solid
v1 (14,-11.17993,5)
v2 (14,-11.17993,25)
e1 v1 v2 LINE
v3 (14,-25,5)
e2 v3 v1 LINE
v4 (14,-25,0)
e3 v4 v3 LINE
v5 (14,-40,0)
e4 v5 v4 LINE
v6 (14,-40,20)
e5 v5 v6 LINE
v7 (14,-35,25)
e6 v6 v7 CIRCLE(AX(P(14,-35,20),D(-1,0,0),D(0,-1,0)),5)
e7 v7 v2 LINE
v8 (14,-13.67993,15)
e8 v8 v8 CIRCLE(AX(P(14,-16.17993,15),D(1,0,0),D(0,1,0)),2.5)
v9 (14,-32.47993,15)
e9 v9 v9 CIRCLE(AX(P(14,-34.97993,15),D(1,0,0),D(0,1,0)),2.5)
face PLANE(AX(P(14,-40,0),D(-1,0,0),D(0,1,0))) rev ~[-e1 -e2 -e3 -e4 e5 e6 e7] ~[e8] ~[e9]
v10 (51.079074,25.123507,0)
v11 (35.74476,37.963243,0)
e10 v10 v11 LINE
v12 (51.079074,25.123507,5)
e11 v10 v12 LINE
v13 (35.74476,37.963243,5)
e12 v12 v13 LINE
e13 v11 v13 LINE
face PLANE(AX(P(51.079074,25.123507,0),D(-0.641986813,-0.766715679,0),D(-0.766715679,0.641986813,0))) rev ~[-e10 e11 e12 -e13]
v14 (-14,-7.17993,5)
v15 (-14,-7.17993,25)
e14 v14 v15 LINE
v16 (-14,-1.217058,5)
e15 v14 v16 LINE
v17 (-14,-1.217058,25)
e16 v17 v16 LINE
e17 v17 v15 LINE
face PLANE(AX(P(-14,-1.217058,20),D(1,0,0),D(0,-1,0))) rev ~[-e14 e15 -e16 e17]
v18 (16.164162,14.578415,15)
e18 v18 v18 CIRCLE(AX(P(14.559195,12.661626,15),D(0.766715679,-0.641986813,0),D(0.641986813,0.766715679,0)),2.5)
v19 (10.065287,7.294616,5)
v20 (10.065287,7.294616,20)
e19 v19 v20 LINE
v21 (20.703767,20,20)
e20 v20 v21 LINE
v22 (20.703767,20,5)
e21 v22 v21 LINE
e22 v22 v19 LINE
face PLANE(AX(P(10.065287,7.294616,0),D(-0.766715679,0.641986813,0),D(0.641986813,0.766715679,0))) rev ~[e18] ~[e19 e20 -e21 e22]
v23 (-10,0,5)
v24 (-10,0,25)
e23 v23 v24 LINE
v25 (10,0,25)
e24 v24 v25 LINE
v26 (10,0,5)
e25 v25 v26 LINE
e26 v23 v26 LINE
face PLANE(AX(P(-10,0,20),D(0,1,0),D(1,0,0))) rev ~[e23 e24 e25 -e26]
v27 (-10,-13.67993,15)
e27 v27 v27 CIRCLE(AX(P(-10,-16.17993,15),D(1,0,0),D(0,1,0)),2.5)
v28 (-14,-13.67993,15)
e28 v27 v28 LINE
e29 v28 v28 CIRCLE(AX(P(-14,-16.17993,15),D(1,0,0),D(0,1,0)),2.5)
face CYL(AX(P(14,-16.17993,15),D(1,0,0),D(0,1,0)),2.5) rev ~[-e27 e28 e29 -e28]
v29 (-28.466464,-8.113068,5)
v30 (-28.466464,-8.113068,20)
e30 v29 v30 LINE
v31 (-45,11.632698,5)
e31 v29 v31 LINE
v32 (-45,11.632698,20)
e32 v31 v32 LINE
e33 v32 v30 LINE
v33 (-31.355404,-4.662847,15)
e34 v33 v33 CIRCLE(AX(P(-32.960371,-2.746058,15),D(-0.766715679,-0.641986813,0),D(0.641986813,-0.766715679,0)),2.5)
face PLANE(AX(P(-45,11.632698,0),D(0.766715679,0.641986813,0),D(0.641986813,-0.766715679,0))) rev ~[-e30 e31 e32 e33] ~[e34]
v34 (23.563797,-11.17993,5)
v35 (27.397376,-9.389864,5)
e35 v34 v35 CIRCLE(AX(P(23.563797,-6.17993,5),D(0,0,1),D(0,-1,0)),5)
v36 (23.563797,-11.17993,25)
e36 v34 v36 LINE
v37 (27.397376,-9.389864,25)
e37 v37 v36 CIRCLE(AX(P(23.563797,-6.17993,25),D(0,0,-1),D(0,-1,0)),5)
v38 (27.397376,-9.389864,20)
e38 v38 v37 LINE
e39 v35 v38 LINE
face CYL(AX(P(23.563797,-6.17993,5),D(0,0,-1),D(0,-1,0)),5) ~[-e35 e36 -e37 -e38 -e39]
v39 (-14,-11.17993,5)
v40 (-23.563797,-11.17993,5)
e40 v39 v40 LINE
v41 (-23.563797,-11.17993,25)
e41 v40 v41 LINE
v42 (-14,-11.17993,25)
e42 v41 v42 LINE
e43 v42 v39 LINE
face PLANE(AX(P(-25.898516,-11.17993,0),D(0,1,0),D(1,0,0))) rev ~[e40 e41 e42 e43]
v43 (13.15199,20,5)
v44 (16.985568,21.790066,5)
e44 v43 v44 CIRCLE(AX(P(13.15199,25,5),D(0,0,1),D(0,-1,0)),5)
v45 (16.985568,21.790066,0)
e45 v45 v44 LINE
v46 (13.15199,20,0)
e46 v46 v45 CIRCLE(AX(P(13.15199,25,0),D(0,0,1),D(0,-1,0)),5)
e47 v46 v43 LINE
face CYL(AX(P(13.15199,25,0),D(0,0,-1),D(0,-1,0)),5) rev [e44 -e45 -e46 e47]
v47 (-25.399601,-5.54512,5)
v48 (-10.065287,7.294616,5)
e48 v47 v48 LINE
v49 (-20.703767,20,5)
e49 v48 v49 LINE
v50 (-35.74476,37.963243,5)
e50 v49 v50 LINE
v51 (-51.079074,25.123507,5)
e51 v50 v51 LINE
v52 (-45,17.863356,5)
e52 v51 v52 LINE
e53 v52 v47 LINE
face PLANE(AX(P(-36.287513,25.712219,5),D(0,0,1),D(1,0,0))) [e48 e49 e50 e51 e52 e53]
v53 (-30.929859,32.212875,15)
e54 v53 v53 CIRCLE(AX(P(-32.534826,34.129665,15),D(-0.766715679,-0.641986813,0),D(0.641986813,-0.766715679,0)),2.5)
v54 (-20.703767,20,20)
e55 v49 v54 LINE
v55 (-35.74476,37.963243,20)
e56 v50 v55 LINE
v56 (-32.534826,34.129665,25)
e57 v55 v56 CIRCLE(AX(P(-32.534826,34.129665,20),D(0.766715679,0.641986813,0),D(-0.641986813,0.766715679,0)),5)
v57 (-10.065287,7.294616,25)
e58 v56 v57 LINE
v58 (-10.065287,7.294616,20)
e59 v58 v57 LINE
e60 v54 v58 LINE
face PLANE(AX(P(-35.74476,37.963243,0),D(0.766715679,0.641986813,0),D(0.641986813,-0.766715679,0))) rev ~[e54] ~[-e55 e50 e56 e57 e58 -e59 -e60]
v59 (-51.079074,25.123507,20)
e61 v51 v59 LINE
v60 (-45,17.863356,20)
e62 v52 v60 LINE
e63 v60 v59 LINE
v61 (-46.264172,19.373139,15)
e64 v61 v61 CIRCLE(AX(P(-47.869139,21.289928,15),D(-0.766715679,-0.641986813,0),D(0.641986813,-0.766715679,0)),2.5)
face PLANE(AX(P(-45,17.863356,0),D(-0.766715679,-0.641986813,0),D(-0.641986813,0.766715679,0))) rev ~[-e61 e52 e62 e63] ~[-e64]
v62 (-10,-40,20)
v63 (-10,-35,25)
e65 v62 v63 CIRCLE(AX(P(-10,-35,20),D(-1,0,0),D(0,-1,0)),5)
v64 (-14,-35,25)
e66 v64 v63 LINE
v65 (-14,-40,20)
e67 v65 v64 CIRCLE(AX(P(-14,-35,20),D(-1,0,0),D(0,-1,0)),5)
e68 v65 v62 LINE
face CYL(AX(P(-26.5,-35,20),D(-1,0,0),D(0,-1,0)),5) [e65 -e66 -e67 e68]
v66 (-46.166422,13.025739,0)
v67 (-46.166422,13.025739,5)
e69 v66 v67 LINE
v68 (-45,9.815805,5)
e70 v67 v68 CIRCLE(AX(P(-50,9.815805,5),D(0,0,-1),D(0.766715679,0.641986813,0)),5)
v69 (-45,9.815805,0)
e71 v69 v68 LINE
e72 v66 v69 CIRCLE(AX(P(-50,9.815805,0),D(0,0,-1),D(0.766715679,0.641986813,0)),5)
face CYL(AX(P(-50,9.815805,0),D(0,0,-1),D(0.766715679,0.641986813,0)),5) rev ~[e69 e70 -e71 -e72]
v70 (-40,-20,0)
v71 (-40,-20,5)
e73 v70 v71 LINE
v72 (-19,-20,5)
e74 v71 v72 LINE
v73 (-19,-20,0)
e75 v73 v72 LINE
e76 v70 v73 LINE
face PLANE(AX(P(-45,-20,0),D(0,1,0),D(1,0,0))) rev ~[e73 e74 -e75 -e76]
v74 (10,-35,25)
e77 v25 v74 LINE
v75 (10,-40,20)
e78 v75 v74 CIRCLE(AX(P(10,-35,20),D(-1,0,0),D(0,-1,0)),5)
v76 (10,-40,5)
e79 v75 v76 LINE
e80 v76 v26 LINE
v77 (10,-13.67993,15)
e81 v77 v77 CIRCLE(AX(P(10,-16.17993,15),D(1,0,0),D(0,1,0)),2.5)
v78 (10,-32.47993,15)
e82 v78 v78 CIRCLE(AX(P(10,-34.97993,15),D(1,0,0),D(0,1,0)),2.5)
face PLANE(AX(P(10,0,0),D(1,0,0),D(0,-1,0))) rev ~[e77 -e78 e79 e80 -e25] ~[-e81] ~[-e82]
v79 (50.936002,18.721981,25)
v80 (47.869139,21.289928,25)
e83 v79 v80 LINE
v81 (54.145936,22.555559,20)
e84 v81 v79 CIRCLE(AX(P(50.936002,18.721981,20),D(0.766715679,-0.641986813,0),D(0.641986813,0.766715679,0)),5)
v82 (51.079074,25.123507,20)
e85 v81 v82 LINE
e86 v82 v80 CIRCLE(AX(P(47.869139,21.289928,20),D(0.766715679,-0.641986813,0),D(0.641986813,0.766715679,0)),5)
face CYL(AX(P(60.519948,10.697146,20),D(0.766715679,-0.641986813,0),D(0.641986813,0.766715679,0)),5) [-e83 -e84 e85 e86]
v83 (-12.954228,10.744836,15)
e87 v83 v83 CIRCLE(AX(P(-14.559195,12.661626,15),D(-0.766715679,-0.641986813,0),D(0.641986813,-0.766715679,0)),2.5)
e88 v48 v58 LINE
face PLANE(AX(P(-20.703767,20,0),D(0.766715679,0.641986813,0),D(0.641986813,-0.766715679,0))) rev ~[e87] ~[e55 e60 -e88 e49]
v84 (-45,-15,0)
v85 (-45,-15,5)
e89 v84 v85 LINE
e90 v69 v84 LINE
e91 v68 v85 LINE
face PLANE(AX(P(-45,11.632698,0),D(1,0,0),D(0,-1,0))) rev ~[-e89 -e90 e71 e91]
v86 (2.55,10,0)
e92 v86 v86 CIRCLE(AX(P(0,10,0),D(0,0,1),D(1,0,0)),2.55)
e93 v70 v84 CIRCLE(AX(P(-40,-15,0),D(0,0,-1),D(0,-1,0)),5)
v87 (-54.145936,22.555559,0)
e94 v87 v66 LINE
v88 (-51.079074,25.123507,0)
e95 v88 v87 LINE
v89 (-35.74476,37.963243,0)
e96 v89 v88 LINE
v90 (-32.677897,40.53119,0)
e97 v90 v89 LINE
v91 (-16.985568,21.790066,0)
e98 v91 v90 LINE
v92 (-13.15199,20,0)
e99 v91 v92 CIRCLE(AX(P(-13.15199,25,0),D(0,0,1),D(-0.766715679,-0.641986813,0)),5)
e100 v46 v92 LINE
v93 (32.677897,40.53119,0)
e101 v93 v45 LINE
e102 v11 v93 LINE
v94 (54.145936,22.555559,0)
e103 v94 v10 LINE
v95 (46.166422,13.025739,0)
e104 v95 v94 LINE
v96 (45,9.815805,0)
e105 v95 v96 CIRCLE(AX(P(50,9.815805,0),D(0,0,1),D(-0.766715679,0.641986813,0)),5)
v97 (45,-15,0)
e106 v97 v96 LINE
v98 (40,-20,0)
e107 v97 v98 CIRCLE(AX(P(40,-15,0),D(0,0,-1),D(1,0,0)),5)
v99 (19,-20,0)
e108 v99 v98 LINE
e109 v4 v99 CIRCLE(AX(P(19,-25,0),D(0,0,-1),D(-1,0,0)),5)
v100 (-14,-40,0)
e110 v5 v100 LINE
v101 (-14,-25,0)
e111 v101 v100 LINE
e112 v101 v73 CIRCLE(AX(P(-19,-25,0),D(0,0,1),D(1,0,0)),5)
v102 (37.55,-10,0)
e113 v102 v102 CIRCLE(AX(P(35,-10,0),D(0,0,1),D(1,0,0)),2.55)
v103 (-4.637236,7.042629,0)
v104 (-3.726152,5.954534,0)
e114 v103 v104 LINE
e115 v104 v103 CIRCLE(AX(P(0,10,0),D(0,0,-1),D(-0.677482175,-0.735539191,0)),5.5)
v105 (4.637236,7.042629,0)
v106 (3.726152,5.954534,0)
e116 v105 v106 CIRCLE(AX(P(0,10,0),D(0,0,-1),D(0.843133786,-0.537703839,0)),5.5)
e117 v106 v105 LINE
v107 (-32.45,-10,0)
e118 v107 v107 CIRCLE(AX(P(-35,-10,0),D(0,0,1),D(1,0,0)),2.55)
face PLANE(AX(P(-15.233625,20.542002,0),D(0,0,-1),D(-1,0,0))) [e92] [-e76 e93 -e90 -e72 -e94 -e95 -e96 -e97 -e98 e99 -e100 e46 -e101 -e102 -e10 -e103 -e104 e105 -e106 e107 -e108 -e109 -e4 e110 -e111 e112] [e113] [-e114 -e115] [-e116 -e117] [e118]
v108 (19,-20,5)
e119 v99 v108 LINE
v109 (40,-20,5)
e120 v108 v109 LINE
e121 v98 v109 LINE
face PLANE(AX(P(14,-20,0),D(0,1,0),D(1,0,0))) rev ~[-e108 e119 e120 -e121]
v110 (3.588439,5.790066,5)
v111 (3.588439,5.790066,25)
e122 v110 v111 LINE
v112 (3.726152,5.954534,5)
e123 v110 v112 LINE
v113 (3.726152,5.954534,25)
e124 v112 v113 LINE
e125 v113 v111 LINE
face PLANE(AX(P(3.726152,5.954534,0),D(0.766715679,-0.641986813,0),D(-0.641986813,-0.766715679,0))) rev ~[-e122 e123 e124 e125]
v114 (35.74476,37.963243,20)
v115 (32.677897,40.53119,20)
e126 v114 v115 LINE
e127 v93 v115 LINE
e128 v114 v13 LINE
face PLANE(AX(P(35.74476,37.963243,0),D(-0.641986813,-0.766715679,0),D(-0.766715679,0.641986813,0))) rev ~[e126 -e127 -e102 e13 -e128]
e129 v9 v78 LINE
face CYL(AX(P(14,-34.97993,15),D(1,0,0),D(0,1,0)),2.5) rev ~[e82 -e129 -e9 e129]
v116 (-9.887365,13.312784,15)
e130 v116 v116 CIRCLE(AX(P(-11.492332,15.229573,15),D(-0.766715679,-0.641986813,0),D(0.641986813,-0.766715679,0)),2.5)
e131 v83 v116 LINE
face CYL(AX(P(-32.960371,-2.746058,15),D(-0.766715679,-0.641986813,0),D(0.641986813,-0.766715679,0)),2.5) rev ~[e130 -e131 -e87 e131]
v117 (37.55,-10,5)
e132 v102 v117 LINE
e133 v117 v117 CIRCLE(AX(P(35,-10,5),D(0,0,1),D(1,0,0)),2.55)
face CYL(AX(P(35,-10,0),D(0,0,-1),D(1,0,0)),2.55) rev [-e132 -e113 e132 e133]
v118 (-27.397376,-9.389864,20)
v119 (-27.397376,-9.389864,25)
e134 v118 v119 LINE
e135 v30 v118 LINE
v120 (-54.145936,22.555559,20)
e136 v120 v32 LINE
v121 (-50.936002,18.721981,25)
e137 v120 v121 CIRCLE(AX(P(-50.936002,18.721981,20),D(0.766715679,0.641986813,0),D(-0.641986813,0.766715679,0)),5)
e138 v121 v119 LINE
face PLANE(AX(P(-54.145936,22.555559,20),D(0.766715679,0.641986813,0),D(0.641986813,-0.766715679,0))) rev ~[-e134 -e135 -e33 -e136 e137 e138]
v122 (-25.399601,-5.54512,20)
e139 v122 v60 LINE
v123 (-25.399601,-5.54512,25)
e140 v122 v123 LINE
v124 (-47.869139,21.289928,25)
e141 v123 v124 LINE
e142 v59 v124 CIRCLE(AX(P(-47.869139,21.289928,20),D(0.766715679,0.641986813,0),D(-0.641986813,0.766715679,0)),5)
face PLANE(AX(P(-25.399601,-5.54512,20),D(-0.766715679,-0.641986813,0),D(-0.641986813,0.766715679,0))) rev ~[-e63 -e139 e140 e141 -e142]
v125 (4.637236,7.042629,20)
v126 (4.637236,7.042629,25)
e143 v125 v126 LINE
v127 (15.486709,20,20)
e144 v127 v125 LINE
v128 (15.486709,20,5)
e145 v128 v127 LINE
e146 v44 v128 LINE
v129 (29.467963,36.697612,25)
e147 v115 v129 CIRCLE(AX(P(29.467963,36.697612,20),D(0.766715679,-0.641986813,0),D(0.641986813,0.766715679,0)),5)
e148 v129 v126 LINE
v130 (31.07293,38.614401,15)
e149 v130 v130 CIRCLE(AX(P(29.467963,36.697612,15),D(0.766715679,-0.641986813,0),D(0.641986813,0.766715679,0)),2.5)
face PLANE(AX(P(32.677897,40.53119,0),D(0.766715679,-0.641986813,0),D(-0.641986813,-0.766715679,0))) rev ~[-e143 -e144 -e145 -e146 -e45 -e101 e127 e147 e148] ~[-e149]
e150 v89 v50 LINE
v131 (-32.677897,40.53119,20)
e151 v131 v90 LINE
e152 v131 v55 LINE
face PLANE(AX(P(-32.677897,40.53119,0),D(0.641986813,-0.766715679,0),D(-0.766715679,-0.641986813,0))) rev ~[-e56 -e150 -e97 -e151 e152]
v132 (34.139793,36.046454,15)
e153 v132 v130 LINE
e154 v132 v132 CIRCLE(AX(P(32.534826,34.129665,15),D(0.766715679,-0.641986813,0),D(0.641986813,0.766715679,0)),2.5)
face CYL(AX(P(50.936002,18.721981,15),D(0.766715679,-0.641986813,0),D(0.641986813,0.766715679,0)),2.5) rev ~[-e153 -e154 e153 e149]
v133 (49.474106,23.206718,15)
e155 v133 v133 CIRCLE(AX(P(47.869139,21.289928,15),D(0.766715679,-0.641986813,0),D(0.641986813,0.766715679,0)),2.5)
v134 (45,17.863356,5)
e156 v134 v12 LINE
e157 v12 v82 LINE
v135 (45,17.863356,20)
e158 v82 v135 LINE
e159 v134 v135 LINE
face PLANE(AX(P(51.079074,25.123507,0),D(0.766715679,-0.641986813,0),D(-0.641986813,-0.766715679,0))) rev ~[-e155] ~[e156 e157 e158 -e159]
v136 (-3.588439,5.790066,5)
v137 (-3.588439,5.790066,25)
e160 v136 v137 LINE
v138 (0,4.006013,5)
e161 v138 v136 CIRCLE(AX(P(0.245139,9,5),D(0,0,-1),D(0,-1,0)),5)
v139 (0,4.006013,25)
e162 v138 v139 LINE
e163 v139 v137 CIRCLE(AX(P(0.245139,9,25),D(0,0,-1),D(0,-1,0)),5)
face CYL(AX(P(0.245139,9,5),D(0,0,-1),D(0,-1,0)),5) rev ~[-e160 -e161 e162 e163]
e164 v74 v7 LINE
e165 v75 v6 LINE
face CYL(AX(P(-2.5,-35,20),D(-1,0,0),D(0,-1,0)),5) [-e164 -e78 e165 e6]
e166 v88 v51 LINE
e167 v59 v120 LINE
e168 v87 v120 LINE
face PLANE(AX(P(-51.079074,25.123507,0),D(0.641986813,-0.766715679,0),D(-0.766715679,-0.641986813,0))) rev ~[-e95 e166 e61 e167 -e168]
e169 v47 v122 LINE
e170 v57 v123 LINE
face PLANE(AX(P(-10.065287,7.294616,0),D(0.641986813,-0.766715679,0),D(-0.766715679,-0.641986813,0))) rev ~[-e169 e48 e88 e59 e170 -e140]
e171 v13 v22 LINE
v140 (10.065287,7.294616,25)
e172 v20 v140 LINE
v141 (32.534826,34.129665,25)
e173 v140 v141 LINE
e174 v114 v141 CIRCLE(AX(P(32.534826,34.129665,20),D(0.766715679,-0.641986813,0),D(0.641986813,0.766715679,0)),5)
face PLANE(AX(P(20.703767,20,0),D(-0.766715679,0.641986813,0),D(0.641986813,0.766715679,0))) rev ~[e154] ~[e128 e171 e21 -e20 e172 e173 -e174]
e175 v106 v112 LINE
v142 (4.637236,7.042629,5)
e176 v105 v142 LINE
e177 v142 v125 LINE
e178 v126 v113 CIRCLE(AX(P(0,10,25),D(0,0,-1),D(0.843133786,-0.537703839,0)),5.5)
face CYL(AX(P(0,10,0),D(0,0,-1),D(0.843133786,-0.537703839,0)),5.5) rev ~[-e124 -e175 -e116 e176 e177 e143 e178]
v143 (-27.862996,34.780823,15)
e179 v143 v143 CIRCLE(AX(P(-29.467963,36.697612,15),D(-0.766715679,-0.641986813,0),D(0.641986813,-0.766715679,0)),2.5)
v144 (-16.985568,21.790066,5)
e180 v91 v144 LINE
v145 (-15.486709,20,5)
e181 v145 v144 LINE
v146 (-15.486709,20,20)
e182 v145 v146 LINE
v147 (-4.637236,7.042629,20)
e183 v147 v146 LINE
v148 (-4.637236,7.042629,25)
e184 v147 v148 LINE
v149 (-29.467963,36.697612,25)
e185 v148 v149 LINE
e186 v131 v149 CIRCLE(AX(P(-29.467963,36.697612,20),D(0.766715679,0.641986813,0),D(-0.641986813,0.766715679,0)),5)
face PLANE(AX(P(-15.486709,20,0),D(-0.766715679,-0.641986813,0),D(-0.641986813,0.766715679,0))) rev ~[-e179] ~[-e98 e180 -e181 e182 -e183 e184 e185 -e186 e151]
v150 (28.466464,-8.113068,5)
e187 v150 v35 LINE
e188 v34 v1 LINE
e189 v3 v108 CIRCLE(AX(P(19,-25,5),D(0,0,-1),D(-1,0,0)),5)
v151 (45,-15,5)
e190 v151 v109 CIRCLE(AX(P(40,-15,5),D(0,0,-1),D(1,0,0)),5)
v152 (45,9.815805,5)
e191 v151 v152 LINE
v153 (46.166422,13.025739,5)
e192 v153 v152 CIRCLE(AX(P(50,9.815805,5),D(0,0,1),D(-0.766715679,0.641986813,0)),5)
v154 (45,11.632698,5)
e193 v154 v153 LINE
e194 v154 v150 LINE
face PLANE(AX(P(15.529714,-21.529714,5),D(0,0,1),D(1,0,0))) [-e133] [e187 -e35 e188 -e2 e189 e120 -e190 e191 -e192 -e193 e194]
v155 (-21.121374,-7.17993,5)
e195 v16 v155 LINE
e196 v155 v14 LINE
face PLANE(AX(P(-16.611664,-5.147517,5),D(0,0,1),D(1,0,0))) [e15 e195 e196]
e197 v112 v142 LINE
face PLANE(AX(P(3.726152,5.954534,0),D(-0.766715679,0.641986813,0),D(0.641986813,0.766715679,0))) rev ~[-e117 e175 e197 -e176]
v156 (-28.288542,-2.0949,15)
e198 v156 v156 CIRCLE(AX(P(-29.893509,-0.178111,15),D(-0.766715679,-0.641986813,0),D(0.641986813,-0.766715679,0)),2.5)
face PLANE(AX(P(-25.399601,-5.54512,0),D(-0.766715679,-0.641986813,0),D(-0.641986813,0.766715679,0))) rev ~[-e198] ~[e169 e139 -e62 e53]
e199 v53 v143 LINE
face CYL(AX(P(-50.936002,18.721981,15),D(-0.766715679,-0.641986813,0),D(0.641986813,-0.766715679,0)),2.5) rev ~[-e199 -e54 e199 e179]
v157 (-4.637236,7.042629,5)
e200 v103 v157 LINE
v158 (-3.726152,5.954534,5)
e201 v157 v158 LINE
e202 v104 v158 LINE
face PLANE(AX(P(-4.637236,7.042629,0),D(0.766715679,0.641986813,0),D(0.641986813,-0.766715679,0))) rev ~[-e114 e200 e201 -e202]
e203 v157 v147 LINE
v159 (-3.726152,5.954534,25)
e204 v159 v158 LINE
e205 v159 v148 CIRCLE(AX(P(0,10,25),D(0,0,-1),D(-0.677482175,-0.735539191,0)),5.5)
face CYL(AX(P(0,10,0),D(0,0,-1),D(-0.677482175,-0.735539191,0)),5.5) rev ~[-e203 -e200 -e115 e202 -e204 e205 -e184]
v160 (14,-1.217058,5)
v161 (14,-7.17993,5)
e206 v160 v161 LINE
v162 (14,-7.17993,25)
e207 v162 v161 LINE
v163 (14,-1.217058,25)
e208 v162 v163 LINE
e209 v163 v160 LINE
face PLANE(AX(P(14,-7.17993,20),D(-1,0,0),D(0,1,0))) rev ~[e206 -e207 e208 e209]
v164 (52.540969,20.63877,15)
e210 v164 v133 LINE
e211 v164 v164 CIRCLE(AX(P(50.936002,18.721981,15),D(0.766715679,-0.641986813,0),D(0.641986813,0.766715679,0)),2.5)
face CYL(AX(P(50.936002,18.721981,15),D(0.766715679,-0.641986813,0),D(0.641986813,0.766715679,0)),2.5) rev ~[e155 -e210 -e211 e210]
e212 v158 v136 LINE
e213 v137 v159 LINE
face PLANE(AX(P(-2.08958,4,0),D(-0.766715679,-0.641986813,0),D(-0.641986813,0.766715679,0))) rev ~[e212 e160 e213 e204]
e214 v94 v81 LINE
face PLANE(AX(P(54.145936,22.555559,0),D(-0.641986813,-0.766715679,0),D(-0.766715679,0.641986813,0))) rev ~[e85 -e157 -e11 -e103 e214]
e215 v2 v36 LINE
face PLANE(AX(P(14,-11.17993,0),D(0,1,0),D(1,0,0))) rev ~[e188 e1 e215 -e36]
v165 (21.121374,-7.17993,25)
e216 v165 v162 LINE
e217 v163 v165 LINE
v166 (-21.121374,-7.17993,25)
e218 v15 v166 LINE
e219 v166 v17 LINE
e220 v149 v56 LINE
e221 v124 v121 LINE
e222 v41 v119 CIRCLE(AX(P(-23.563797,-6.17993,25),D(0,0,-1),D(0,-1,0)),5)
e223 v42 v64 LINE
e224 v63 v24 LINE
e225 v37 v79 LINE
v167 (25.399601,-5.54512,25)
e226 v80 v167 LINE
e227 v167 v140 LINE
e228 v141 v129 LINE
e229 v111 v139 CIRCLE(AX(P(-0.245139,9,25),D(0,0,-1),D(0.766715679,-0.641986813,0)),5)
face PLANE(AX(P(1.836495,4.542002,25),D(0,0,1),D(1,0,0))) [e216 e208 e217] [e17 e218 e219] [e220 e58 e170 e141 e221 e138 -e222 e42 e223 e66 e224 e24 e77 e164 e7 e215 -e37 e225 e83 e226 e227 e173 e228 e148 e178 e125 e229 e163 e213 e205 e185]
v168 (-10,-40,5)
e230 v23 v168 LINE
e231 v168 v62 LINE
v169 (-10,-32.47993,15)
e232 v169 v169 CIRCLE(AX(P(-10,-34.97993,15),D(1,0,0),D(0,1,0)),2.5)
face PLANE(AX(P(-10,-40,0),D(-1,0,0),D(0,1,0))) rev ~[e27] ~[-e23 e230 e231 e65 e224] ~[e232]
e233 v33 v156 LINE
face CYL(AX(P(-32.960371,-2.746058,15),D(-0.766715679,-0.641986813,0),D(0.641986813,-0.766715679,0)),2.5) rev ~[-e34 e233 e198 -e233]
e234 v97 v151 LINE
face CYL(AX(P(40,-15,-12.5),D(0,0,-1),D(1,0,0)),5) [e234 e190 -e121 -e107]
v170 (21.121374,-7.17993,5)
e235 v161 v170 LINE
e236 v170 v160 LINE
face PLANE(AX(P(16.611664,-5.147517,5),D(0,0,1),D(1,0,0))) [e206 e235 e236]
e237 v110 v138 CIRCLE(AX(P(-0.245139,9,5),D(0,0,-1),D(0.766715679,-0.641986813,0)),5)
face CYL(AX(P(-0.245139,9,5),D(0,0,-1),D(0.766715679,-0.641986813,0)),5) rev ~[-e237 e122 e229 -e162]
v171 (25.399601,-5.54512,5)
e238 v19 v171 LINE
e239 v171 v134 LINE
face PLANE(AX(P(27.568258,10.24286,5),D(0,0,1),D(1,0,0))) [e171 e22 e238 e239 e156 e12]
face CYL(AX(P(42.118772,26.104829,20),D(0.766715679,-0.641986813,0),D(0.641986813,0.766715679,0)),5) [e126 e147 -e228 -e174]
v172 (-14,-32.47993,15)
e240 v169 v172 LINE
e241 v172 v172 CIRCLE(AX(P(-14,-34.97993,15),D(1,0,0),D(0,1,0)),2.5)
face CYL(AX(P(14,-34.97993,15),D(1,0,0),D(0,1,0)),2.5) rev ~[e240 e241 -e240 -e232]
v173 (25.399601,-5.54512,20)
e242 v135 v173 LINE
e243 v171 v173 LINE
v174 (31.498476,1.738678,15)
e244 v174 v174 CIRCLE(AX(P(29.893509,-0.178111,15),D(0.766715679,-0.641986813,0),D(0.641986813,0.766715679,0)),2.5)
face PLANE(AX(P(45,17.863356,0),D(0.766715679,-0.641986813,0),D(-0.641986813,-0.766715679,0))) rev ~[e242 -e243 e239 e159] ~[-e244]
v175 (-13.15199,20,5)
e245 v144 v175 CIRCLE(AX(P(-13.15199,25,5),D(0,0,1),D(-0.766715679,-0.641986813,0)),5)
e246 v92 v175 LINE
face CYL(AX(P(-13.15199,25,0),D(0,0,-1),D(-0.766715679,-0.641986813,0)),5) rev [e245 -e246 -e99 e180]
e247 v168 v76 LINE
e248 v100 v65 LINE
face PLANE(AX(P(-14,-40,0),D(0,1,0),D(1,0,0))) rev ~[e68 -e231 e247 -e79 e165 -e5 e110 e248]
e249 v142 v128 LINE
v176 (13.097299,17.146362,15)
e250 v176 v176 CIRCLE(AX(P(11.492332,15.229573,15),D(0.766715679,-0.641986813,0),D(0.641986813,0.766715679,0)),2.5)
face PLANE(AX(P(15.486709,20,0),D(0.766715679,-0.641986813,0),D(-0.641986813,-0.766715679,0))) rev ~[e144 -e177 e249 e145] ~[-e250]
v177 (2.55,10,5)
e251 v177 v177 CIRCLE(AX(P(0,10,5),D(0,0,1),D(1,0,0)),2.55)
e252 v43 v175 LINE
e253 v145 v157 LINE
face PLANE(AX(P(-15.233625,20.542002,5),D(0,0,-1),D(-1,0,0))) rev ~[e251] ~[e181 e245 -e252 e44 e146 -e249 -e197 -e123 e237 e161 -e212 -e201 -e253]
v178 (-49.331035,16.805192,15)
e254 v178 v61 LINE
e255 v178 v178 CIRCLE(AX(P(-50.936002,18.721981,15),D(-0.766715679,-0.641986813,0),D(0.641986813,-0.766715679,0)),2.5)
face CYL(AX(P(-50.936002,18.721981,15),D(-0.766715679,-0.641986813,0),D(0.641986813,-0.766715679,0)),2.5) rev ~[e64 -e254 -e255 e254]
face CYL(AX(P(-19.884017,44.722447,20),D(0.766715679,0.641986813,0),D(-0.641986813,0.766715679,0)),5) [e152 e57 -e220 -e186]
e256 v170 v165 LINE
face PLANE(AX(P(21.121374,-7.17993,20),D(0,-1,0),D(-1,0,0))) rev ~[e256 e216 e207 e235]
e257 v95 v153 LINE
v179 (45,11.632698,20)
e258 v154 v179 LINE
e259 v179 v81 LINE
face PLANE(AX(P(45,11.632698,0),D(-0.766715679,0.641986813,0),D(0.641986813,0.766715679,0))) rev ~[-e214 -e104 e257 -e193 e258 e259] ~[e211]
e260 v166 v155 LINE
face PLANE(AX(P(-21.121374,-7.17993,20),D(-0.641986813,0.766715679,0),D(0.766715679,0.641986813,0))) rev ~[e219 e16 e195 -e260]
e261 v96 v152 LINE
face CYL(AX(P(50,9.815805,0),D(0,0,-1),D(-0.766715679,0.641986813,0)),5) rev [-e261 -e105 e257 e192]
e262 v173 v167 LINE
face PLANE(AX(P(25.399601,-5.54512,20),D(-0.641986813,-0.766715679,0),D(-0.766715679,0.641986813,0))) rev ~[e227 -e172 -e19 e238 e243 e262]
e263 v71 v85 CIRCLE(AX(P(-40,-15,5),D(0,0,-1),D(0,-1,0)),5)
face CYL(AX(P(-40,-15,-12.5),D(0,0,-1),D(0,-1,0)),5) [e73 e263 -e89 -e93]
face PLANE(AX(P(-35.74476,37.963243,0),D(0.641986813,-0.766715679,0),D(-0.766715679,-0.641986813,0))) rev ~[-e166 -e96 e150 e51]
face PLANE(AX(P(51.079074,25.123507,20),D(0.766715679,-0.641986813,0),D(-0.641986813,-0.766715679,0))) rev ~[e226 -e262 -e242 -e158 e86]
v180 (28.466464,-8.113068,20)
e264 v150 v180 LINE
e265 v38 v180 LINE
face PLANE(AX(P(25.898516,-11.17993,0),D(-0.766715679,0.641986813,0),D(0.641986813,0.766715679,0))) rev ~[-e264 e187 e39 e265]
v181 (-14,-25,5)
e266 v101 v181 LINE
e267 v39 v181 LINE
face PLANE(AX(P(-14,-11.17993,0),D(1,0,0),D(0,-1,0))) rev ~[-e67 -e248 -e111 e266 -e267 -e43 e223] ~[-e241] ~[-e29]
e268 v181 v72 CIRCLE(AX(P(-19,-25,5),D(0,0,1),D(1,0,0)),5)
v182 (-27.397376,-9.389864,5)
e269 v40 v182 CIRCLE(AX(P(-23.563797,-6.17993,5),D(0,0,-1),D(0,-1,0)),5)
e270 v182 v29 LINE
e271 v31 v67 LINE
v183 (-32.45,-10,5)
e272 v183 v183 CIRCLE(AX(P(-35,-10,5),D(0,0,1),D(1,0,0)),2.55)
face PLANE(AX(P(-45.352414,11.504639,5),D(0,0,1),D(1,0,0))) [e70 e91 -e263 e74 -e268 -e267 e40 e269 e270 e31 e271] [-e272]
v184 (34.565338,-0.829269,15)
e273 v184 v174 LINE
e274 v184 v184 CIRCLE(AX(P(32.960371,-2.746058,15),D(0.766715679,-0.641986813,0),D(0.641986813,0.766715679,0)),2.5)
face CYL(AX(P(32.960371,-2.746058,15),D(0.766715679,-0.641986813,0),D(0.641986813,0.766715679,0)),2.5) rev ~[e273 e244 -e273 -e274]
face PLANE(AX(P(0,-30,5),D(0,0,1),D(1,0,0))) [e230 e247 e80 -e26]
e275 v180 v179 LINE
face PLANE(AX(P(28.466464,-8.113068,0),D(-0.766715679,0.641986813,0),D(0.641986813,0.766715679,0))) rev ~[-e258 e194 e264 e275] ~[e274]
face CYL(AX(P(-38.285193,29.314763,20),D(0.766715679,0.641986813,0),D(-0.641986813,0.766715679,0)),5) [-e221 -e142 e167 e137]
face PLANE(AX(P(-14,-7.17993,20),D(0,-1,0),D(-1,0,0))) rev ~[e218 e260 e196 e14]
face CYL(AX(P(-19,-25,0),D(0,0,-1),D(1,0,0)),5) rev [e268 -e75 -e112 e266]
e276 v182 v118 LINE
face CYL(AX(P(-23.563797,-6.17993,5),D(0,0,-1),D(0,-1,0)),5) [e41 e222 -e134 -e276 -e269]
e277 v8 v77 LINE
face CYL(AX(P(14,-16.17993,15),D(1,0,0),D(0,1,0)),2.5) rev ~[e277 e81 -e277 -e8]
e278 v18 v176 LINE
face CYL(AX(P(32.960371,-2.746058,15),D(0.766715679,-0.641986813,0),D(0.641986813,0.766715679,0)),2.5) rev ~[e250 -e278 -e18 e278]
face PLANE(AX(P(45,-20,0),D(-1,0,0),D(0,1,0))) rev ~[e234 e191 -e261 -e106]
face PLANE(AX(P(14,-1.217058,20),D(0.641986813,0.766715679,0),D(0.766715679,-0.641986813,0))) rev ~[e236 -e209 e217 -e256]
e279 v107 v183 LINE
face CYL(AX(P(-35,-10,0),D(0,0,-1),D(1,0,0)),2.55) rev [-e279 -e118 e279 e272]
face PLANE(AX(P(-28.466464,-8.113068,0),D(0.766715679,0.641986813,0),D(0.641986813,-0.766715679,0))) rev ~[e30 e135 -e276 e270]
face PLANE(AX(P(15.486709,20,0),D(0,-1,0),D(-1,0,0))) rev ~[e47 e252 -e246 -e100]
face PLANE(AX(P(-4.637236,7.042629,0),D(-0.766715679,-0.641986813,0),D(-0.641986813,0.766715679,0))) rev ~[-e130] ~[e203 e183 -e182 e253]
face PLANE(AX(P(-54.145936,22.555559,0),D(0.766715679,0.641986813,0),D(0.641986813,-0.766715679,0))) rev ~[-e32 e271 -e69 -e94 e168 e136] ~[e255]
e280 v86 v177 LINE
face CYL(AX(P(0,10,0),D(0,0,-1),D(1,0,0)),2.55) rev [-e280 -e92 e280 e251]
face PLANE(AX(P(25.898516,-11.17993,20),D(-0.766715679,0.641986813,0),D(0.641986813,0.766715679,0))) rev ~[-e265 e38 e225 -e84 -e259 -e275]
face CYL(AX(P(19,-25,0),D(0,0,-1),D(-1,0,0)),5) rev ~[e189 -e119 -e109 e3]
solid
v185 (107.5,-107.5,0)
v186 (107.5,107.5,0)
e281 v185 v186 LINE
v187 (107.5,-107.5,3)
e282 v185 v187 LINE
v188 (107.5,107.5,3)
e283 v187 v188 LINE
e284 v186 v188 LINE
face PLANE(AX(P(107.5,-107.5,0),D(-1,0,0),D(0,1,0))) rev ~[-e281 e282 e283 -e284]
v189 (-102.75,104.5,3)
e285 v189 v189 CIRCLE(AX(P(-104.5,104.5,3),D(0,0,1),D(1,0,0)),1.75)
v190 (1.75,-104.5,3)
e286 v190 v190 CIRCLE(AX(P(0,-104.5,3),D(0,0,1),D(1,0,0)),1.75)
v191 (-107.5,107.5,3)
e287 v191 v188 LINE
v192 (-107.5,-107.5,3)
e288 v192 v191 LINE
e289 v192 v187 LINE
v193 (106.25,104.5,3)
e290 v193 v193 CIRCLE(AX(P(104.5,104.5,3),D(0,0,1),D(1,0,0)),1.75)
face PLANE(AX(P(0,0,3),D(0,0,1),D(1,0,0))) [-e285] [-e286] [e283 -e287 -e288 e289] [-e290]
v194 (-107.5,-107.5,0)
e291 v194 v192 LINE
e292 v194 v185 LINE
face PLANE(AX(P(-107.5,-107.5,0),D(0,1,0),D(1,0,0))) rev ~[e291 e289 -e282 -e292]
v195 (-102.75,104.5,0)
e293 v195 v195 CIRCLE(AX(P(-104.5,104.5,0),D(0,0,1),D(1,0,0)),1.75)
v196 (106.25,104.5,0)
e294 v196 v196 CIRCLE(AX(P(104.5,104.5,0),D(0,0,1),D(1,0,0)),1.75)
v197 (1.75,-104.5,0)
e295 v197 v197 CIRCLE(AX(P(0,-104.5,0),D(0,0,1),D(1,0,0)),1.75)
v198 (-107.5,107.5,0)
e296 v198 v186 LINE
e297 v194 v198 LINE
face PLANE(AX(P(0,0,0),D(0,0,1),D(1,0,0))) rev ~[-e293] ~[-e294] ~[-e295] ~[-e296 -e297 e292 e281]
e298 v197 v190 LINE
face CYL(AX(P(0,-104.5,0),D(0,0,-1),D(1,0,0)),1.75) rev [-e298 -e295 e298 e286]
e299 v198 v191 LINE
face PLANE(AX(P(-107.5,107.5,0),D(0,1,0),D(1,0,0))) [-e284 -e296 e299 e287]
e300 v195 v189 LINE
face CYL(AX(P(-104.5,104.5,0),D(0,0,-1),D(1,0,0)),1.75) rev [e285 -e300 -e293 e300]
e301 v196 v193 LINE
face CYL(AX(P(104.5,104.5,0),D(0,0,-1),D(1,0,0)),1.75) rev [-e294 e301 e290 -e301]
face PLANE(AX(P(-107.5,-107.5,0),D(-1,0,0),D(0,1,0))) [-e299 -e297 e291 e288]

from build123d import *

# Parameters (mm, degrees)
F0_W          = 215
F0_H          = 215
F0_R          = 1.75
F1_DEPTH      = 3
F2_W          = 4
F2_H          = 20
F3_DEPTH      = 20
F2_R          = 5.5
F2_R_2        = 2.55
F2_W_2        = 20
F4_DEPTH      = 5
F5_R          = 2.5
F6_DEPTH      = 40
F7_R          = 2.5
F8_DEPTH      = 40
F9_R          = 2.5
F10_DEPTH     = 40
F11_T1_DEPTH  = 20
F11_T3_DEPTH  = 5
F11_T5_DEPTH  = 30
F11_T7_DEPTH  = 25.8367983923
F11_T9_DEPTH  = 29
F11_T11_DEPTH = 29
F11_T13_DEPTH = 29
F11_T15_DEPTH = 29
F11_T17_DEPTH = 29
F11_T19_DEPTH = 29


# Not quite as in the source:
# - a fillet or chamfer that OpenCascade refuses, or shapes differently, is made with other operations: its cross-section is extruded or revolved along the edge and cut away or added


with BuildPart() as f1:
    # F0 (on Top) → F1 (new body)
    with BuildSketch(Plane.XY):
        Rectangle(F0_W, F0_H)
        with Locations((0, -104.5)):
            Circle(F0_R, mode=Mode.SUBTRACT)
        with Locations((-104.5, 104.5)):
            Circle(F0_R, mode=Mode.SUBTRACT)
        with Locations((104.5, 104.5)):
            Circle(F0_R, mode=Mode.SUBTRACT)
    extrude(amount=F1_DEPTH)


with BuildPart() as f3:
    # F2 (on Top) → F3 (new body)
    with BuildSketch(Plane.XY):
        Polygon((-35.7447599302, 37.963242952), (-20.7037670278, 20), (-15.4867092456, 20), (-32.6778972141, 40.5311902024), align=None)
        with BuildLine():
            Line((-15.4867092456, 20), (-20.7037670278, 20))
            Line((-20.7037670278, 20), (-10.0652874269, 7.2946157909))
            Line((-10.0652874269, 7.2946157909), (-14, 4))
            Line((-14, 4), (-2.089580059, 4))
            Line((-2.089580059, 4), (-3.7261519654, 5.9545344482))
            ThreePointArc((-3.7261519654, 5.9545344482), (-4.2169362347, 6.4690725308), (-4.6372358245, 7.0426288856))
            Line((-4.6372358245, 7.0426288856), (-15.4867092456, 20))
        make_face()
        Polygon((-25.3996010074, -5.5451204608), (-45, 17.8633560503), (-45, 11.6326984705), (-28.4664637236, -8.1130677111), (-25.8985164732, -11.1799304272), (-21.1213736161, -7.1799304272), (-14, -1.2170577822), (-14, 0), (-14, 4), align=None)
        Polygon((-45, 11.6326984705), (-45, 17.8633560503), (-51.0790735108, 25.1235067004), (-54.1459362269, 22.55555945), align=None)
        Polygon((-2.089580059, 4), (-14, 4), (-14, 0), (-10, 0), (10, 0), (14, 0), (14, 4), (2.089580059, 4), align=None)
        Polygon((-21.1213736161, -7.1799304272), (-25.8985164732, -11.1799304272), (-14, -11.1799304272), (-14, -7.1799304272), align=None)
        Polygon((-10, 0), (-14, 0), (-14, -1.2170577822), (-14, -7.1799304272), (-14, -11.1799304272), (-14, -20), (-10, -20), align=None)
        Polygon((14, 0), (10, 0), (10, -20), (14, -20), (14, -11.1799304272), (14, -7.1799304272), (14, -1.2170577822), align=None)
        with Locations((12, -30)):
            Rectangle(F2_W, F2_H)
        with Locations((-12, -30)):
            Rectangle(F2_W, F2_H)
        Polygon((14, -7.1799304272), (14, -11.1799304272), (25.8985164732, -11.1799304272), (21.1213736161, -7.1799304272), align=None)
        Polygon((45, 11.6326984705), (45, 17.8633560503), (25.3996010074, -5.5451204608), (14, 4), (14, 0), (14, -1.2170577822), (21.1213736161, -7.1799304272), (25.8985164732, -11.1799304272), (28.4664637236, -8.1130677111), align=None)
        with BuildLine():
            Line((20.7037670278, 20), (15.4867092456, 20))
            Line((15.4867092456, 20), (4.6372358245, 7.0426288856))
            ThreePointArc((4.6372358245, 7.0426288856), (4.2169362347, 6.4690725308), (3.7261519654, 5.9545344482))
            Line((3.7261519654, 5.9545344482), (2.089580059, 4))
            Line((2.089580059, 4), (14, 4))
            Line((14, 4), (10.0652874269, 7.2946157909))
            Line((10.0652874269, 7.2946157909), (20.7037670278, 20))
        make_face()
        Polygon((32.6778972141, 40.5311902024), (15.4867092456, 20), (20.7037670278, 20), (35.7447599302, 37.963242952), align=None)
        Polygon((51.0790735108, 25.1235067004), (45, 17.8633560503), (45, 11.6326984705), (54.1459362269, 22.55555945), align=None)
    extrude(amount=F3_DEPTH)

    # F2 (on Top) + F3_face (on face) → F4 (join)
    with BuildSketch(Plane.XY):
        Polygon((-45, 17.8633560503), (-45, 20), (-20.7037670278, 20), (-35.7447599302, 37.963242952), (-51.0790735108, 25.1235067004), align=None)
        Polygon((-28.4664637236, -8.1130677111), (-45, 11.6326984705), (-45, -20), (-14, -20), (-14, -11.1799304272), (-25.8985164732, -11.1799304272), align=None)
        with Locations((-35, -10)):
            Circle(F2_R, mode=Mode.SUBTRACT)
        with Locations((-35, -10)):
            Circle(F2_R)
        with Locations((-35, -10)):
            Circle(F2_R_2, mode=Mode.SUBTRACT)
        Polygon((-14, -7.1799304272), (-14, -1.2170577822), (-21.1213736161, -7.1799304272), align=None)
        Polygon((-20.7037670278, 20), (-45, 20), (-45, 17.8633560503), (-25.3996010074, -5.5451204608), (-14, 4), (-10.0652874269, 7.2946157909), align=None)
        with Locations((0, -30)):
            Rectangle(F2_W_2, F2_H)
        Polygon((45, -20), (45, 11.6326984705), (28.4664637236, -8.1130677111), (25.8985164732, -11.1799304272), (14, -11.1799304272), (14, -20), align=None)
        with Locations((35, -10)):
            Circle(F2_R, mode=Mode.SUBTRACT)
        Polygon((21.1213736161, -7.1799304272), (14, -1.2170577822), (14, -7.1799304272), align=None)
        with Locations((35, -10)):
            Circle(F2_R)
        with Locations((35, -10)):
            Circle(F2_R_2, mode=Mode.SUBTRACT)
        Polygon((45, 20), (20.7037670278, 20), (10.0652874269, 7.2946157909), (14, 4), (25.3996010074, -5.5451204608), (45, 17.8633560503), align=None)
        with BuildLine():
            Line((15.4867092456, 20), (-15.4867092456, 20))
            Line((-15.4867092456, 20), (-4.6372358245, 7.0426288856))
            ThreePointArc((-4.6372358245, 7.0426288856), (-1.5403251224, 15.2799051618), (5.5, 10))
            ThreePointArc((5.5, 10), (5.2799051618, 8.4596748776), (4.6372358245, 7.0426288856))
            Line((4.6372358245, 7.0426288856), (15.4867092456, 20))
        make_face()
        with BuildLine():
            ThreePointArc((5.5, 10), (-1.5403251224, 15.2799051618), (-4.6372358245, 7.0426288856))
            Line((-4.6372358245, 7.0426288856), (-3.7261519654, 5.9545344482))
            ThreePointArc((-3.7261519654, 5.9545344482), (0, 4.5), (3.7261519654, 5.9545344482))
            Line((3.7261519654, 5.9545344482), (4.6372358245, 7.0426288856))
            ThreePointArc((4.6372358245, 7.0426288856), (5.2799051618, 8.4596748776), (5.5, 10))
        make_face()
        with Locations((0, 10)):
            Circle(F2_R_2, mode=Mode.SUBTRACT)
        with BuildLine():
            ThreePointArc((3.7261519654, 5.9545344482), (0, 4.5), (-3.7261519654, 5.9545344482))
            Line((-3.7261519654, 5.9545344482), (-2.089580059, 4))
            Line((-2.089580059, 4), (2.089580059, 4))
            Line((2.089580059, 4), (3.7261519654, 5.9545344482))
        make_face()
        Polygon((35.7447599302, 37.963242952), (20.7037670278, 20), (45, 20), (45, 17.8633560503), (51.0790735108, 25.1235067004), align=None)
        with Locations((0, -10)):
            Rectangle(F2_W_2, F2_H)
    with BuildSketch(Plane(origin=(0, 2.4667612993, 20), x_dir=(1, 0, 0), z_dir=(0, 0, 1))):
        with BuildLine():
            Line((-32.6778972141, 38.0644289031), (-35.7447599302, 35.4964816527))
            Line((-35.7447599302, 35.4964816527), (-10.0652874269, 4.8278544916))
            Line((-10.0652874269, 4.8278544916), (-25.3996010074, -8.0118817601))
            Line((-25.3996010074, -8.0118817601), (-51.0790735108, 22.6567454011))
            Line((-51.0790735108, 22.6567454011), (-54.1459362269, 20.0887981507))
            Line((-54.1459362269, 20.0887981507), (-25.8985164732, -13.6466917265))
            Line((-25.8985164732, -13.6466917265), (-14, -13.6466917265))
            Line((-14, -13.6466917265), (-14, -42.4667612993))
            Line((-14, -42.4667612993), (-10, -42.4667612993))
            Line((-10, -42.4667612993), (-10, -2.4667612993))
            Line((-10, -2.4667612993), (10, -2.4667612993))
            Line((10, -2.4667612993), (10, -42.4667612993))
            Line((10, -42.4667612993), (14, -42.4667612993))
            Line((14, -42.4667612993), (14, -13.6466917265))
            Line((14, -13.6466917265), (25.8985164732, -13.6466917265))
            Line((25.8985164732, -13.6466917265), (54.1459362269, 20.0887981507))
            Line((54.1459362269, 20.0887981507), (51.0790735108, 22.6567454011))
            Line((51.0790735108, 22.6567454011), (25.3996010074, -8.0118817601))
            Line((25.3996010074, -8.0118817601), (10.0652874269, 4.8278544916))
            Line((10.0652874269, 4.8278544916), (35.7447599302, 35.4964816527))
            Line((35.7447599302, 35.4964816527), (32.6778972141, 38.0644289031))
            Line((32.6778972141, 38.0644289031), (4.6372358245, 4.5758675863))
            ThreePointArc((4.6372358245, 4.5758675863), (4.2169362347, 4.0023112315), (3.7261519654, 3.4877731489))
            Line((3.7261519654, 3.4877731489), (2.089580059, 1.5332387007))
            Line((2.089580059, 1.5332387007), (-2.089580059, 1.5332387007))
            Line((-2.089580059, 1.5332387007), (-3.7261519654, 3.4877731489))
            ThreePointArc((-3.7261519654, 3.4877731489), (-4.2169362347, 4.0023112315), (-4.6372358245, 4.5758675863))
            Line((-4.6372358245, 4.5758675863), (-32.6778972141, 38.0644289031))
        make_face()
        Polygon((21.1213736161, -9.6466917265), (14, -9.6466917265), (14, -3.6838190815), align=None, mode=Mode.SUBTRACT)
        Polygon((-14, -9.6466917265), (-21.1213736161, -9.6466917265), (-14, -3.6838190815), align=None, mode=Mode.SUBTRACT)
    extrude(amount=F4_DEPTH)

    # F5 (on face) → F6 (cut)
    with BuildSketch(Plane.YZ.offset(14)):
        with Locations((-34.9799304272, 15)):
            Circle(F5_R)
        with Locations((-16.1799304272, 15)):
            Circle(F5_R)
    extrude(amount=-F6_DEPTH, mode=Mode.SUBTRACT)

    # F7 (on face) → F8 (cut)
    with BuildSketch(Plane(origin=(20.7275193584, -17.3555784101, 0), x_dir=(0.6419868126, 0.766715679, 0), z_dir=(0.766715679, -0.6419868126, 0))):
        with Locations((19.0546780923, 15)):
            Circle(F7_R)
        with Locations((47.0546780923, 15)):
            Circle(F7_R)
    extrude(amount=-F8_DEPTH, mode=Mode.SUBTRACT)

    # F9 (on face) → F10 (cut)
    with BuildSketch(Plane(origin=(-20.7275193584, -17.3555784101, 0), x_dir=(0.6419868126, -0.766715679, 0), z_dir=(-0.766715679, -0.6419868126, 0))):
        with Locations((-47.0546780923, 15)):
            Circle(F9_R)
        with Locations((-19.0546780923, 15)):
            Circle(F9_R)
    extrude(amount=-F10_DEPTH, mode=Mode.SUBTRACT)

    # F11: fillet of radius 5 on 18 edges, made by hand

    # F11_s2 → F11_t1 (join)
    with BuildSketch(Plane.XY.offset(5)):
        with BuildLine():
            ThreePointArc((3.5884390972, 5.7900659371), (1.870319244, 4.4695656767), (-0.2451392979, 4))
            Line((-0.2451392979, 4), (2.089580059, 4))
            Line((2.089580059, 4), (3.5884390972, 5.7900659371))
        make_face()
        with BuildLine():
            ThreePointArc((0.2451392979, 4), (-1.870319244, 4.4695656767), (-3.5884390972, 5.7900659371))
            Line((-3.5884390972, 5.7900659371), (-2.089580059, 4))
            Line((-2.089580059, 4), (0.2451392979, 4))
        make_face()
    extrude(amount=F11_T1_DEPTH)

    # F11_s4 → F11_t3 (join)
    with BuildSketch(Plane.XY):
        with BuildLine():
            ThreePointArc((-16.9855682838, 21.7900659371), (-15.2674484306, 20.4695656767), (-13.1519898887, 20))
            Line((-13.1519898887, 20), (-15.4867092456, 20))
            Line((-15.4867092456, 20), (-16.9855682838, 21.7900659371))
        make_face()
        with BuildLine():
            ThreePointArc((13.1519898887, 20), (15.2674484306, 20.4695656767), (16.9855682838, 21.7900659371))
            Line((16.9855682838, 21.7900659371), (15.4867092456, 20))
            Line((15.4867092456, 20), (13.1519898887, 20))
        make_face()
        with BuildLine():
            ThreePointArc((46.1664216049, 13.02573913), (45.300644088, 11.5234508184), (45, 9.8158050671))
            Line((45, 9.8158050671), (45, 11.6326984705))
            Line((45, 11.6326984705), (46.1664216049, 13.02573913))
        make_face()
        with BuildLine():
            ThreePointArc((14, -25), (15.4644660941, -21.4644660941), (19, -20))
            Line((19, -20), (14, -20))
            Line((14, -20), (14, -25))
        make_face()
        with BuildLine():
            ThreePointArc((-14, -25), (-15.4644660941, -21.4644660941), (-19, -20))
            Line((-19, -20), (-14, -20))
            Line((-14, -20), (-14, -25))
        make_face()
        with BuildLine():
            ThreePointArc((-46.1664216049, 13.02573913), (-45.300644088, 11.5234508184), (-45, 9.8158050671))
            Line((-45, 9.8158050671), (-45, 11.6326984705))
            Line((-45, 11.6326984705), (-46.1664216049, 13.02573913))
        make_face()
    extrude(amount=F11_T3_DEPTH)

    # F11_s6 → F11_t5 (cut)
    with BuildSketch(Plane.XY.offset(-12.5)):
        with BuildLine():
            ThreePointArc((-40, -20), (-43.5355339059, -18.5355339059), (-45, -15))
            Line((-45, -15), (-45, -20))
            Line((-45, -20), (-40, -20))
        make_face()
        with BuildLine():
            ThreePointArc((45, -15), (43.5355339059, -18.5355339059), (40, -20))
            Line((40, -20), (45, -20))
            Line((45, -20), (45, -15))
        make_face()
    extrude(amount=F11_T5_DEPTH, mode=Mode.SUBTRACT)

    # F11_s8 → F11_t7 (cut)
    with BuildSketch(Plane.XY.offset(5)):
        with BuildLine():
            ThreePointArc((-23.5637971163, -11.1799304272), (-25.6792556583, -10.7103647505), (-27.3973755114, -9.3898644901))
            Line((-27.3973755114, -9.3898644901), (-25.8985164732, -11.1799304272))
            Line((-25.8985164732, -11.1799304272), (-23.5637971163, -11.1799304272))
        make_face()
        with BuildLine():
            ThreePointArc((23.5637971163, -11.1799304272), (25.6792556583, -10.7103647505), (27.3973755114, -9.3898644901))
            Line((27.3973755114, -9.3898644901), (25.8985164732, -11.1799304272))
            Line((25.8985164732, -11.1799304272), (23.5637971163, -11.1799304272))
        make_face()
    extrude(amount=F11_T7_DEPTH, mode=Mode.SUBTRACT)

    # F11_s10 → F11_t9 (cut)
    with BuildSketch(Plane(origin=(10.3244656423, 8.6448874995, 0), x_dir=(0, 0, 1), z_dir=(-0.766715679, -0.6419868126, 0))):
        with BuildLine():
            ThreePointArc((20, 52.0546780923), (23.5355339059, 50.5902119982), (25, 47.0546780923))
            Line((25, 47.0546780923), (25, 52.0546780923))
            Line((25, 52.0546780923), (20, 52.0546780923))
        make_face()
    extrude(amount=F11_T9_DEPTH, mode=Mode.SUBTRACT)

    # F11_s12 → F11_t11 (cut)
    with BuildSketch(Plane(origin=(-8.0767106544, -6.7627960025, 0), x_dir=(0, 0, 1), z_dir=(-0.766715679, -0.6419868126, 0))):
        with BuildLine():
            ThreePointArc((20, 52.0546780923), (23.5355339059, 50.5902119982), (25, 47.0546780923))
            Line((25, 47.0546780923), (25, 52.0546780923))
            Line((25, 52.0546780923), (20, 52.0546780923))
        make_face()
    extrude(amount=F11_T11_DEPTH, mode=Mode.SUBTRACT)

    # F11_s14 → F11_t13 (cut)
    with BuildSketch(Plane.YZ.offset(-26.5)):
        with BuildLine():
            ThreePointArc((-40, 20), (-38.5355339059, 23.5355339059), (-35, 25))
            Line((-35, 25), (-40, 25))
            Line((-40, 25), (-40, 20))
        make_face()
    extrude(amount=F11_T13_DEPTH, mode=Mode.SUBTRACT)

    # F11_s16 → F11_t15 (cut)
    with BuildSketch(Plane.YZ.offset(-2.5)):
        with BuildLine():
            ThreePointArc((-40, 20), (-38.5355339059, 23.5355339059), (-35, 25))
            Line((-35, 25), (-40, 25))
            Line((-40, 25), (-40, 20))
        make_face()
    extrude(amount=F11_T15_DEPTH, mode=Mode.SUBTRACT)

    # F11_s18 → F11_t17 (cut)
    with BuildSketch(Plane(origin=(30.3114653462, -25.3804135674, 0), x_dir=(0, 0, 1), z_dir=(-0.766715679, 0.6419868126, 0))):
        with BuildLine():
            ThreePointArc((20, 52.0546780923), (23.5355339059, 50.5902119982), (25, 47.0546780923))
            Line((25, 47.0546780923), (25, 52.0546780923))
            Line((25, 52.0546780923), (20, 52.0546780923))
        make_face()
    extrude(amount=F11_T17_DEPTH, mode=Mode.SUBTRACT)

    # F11_s20 → F11_t19 (cut)
    with BuildSketch(Plane(origin=(11.9102890495, -9.9727300654, 0), x_dir=(0, 0, 1), z_dir=(-0.766715679, 0.6419868126, 0))):
        with BuildLine():
            ThreePointArc((20, 52.0546780923), (23.5355339059, 50.5902119982), (25, 47.0546780923))
            Line((25, 47.0546780923), (25, 52.0546780923))
            Line((25, 52.0546780923), (20, 52.0546780923))
        make_face()
    extrude(amount=F11_T19_DEPTH, mode=Mode.SUBTRACT)


solid = Compound([f1.part, f3.part])
